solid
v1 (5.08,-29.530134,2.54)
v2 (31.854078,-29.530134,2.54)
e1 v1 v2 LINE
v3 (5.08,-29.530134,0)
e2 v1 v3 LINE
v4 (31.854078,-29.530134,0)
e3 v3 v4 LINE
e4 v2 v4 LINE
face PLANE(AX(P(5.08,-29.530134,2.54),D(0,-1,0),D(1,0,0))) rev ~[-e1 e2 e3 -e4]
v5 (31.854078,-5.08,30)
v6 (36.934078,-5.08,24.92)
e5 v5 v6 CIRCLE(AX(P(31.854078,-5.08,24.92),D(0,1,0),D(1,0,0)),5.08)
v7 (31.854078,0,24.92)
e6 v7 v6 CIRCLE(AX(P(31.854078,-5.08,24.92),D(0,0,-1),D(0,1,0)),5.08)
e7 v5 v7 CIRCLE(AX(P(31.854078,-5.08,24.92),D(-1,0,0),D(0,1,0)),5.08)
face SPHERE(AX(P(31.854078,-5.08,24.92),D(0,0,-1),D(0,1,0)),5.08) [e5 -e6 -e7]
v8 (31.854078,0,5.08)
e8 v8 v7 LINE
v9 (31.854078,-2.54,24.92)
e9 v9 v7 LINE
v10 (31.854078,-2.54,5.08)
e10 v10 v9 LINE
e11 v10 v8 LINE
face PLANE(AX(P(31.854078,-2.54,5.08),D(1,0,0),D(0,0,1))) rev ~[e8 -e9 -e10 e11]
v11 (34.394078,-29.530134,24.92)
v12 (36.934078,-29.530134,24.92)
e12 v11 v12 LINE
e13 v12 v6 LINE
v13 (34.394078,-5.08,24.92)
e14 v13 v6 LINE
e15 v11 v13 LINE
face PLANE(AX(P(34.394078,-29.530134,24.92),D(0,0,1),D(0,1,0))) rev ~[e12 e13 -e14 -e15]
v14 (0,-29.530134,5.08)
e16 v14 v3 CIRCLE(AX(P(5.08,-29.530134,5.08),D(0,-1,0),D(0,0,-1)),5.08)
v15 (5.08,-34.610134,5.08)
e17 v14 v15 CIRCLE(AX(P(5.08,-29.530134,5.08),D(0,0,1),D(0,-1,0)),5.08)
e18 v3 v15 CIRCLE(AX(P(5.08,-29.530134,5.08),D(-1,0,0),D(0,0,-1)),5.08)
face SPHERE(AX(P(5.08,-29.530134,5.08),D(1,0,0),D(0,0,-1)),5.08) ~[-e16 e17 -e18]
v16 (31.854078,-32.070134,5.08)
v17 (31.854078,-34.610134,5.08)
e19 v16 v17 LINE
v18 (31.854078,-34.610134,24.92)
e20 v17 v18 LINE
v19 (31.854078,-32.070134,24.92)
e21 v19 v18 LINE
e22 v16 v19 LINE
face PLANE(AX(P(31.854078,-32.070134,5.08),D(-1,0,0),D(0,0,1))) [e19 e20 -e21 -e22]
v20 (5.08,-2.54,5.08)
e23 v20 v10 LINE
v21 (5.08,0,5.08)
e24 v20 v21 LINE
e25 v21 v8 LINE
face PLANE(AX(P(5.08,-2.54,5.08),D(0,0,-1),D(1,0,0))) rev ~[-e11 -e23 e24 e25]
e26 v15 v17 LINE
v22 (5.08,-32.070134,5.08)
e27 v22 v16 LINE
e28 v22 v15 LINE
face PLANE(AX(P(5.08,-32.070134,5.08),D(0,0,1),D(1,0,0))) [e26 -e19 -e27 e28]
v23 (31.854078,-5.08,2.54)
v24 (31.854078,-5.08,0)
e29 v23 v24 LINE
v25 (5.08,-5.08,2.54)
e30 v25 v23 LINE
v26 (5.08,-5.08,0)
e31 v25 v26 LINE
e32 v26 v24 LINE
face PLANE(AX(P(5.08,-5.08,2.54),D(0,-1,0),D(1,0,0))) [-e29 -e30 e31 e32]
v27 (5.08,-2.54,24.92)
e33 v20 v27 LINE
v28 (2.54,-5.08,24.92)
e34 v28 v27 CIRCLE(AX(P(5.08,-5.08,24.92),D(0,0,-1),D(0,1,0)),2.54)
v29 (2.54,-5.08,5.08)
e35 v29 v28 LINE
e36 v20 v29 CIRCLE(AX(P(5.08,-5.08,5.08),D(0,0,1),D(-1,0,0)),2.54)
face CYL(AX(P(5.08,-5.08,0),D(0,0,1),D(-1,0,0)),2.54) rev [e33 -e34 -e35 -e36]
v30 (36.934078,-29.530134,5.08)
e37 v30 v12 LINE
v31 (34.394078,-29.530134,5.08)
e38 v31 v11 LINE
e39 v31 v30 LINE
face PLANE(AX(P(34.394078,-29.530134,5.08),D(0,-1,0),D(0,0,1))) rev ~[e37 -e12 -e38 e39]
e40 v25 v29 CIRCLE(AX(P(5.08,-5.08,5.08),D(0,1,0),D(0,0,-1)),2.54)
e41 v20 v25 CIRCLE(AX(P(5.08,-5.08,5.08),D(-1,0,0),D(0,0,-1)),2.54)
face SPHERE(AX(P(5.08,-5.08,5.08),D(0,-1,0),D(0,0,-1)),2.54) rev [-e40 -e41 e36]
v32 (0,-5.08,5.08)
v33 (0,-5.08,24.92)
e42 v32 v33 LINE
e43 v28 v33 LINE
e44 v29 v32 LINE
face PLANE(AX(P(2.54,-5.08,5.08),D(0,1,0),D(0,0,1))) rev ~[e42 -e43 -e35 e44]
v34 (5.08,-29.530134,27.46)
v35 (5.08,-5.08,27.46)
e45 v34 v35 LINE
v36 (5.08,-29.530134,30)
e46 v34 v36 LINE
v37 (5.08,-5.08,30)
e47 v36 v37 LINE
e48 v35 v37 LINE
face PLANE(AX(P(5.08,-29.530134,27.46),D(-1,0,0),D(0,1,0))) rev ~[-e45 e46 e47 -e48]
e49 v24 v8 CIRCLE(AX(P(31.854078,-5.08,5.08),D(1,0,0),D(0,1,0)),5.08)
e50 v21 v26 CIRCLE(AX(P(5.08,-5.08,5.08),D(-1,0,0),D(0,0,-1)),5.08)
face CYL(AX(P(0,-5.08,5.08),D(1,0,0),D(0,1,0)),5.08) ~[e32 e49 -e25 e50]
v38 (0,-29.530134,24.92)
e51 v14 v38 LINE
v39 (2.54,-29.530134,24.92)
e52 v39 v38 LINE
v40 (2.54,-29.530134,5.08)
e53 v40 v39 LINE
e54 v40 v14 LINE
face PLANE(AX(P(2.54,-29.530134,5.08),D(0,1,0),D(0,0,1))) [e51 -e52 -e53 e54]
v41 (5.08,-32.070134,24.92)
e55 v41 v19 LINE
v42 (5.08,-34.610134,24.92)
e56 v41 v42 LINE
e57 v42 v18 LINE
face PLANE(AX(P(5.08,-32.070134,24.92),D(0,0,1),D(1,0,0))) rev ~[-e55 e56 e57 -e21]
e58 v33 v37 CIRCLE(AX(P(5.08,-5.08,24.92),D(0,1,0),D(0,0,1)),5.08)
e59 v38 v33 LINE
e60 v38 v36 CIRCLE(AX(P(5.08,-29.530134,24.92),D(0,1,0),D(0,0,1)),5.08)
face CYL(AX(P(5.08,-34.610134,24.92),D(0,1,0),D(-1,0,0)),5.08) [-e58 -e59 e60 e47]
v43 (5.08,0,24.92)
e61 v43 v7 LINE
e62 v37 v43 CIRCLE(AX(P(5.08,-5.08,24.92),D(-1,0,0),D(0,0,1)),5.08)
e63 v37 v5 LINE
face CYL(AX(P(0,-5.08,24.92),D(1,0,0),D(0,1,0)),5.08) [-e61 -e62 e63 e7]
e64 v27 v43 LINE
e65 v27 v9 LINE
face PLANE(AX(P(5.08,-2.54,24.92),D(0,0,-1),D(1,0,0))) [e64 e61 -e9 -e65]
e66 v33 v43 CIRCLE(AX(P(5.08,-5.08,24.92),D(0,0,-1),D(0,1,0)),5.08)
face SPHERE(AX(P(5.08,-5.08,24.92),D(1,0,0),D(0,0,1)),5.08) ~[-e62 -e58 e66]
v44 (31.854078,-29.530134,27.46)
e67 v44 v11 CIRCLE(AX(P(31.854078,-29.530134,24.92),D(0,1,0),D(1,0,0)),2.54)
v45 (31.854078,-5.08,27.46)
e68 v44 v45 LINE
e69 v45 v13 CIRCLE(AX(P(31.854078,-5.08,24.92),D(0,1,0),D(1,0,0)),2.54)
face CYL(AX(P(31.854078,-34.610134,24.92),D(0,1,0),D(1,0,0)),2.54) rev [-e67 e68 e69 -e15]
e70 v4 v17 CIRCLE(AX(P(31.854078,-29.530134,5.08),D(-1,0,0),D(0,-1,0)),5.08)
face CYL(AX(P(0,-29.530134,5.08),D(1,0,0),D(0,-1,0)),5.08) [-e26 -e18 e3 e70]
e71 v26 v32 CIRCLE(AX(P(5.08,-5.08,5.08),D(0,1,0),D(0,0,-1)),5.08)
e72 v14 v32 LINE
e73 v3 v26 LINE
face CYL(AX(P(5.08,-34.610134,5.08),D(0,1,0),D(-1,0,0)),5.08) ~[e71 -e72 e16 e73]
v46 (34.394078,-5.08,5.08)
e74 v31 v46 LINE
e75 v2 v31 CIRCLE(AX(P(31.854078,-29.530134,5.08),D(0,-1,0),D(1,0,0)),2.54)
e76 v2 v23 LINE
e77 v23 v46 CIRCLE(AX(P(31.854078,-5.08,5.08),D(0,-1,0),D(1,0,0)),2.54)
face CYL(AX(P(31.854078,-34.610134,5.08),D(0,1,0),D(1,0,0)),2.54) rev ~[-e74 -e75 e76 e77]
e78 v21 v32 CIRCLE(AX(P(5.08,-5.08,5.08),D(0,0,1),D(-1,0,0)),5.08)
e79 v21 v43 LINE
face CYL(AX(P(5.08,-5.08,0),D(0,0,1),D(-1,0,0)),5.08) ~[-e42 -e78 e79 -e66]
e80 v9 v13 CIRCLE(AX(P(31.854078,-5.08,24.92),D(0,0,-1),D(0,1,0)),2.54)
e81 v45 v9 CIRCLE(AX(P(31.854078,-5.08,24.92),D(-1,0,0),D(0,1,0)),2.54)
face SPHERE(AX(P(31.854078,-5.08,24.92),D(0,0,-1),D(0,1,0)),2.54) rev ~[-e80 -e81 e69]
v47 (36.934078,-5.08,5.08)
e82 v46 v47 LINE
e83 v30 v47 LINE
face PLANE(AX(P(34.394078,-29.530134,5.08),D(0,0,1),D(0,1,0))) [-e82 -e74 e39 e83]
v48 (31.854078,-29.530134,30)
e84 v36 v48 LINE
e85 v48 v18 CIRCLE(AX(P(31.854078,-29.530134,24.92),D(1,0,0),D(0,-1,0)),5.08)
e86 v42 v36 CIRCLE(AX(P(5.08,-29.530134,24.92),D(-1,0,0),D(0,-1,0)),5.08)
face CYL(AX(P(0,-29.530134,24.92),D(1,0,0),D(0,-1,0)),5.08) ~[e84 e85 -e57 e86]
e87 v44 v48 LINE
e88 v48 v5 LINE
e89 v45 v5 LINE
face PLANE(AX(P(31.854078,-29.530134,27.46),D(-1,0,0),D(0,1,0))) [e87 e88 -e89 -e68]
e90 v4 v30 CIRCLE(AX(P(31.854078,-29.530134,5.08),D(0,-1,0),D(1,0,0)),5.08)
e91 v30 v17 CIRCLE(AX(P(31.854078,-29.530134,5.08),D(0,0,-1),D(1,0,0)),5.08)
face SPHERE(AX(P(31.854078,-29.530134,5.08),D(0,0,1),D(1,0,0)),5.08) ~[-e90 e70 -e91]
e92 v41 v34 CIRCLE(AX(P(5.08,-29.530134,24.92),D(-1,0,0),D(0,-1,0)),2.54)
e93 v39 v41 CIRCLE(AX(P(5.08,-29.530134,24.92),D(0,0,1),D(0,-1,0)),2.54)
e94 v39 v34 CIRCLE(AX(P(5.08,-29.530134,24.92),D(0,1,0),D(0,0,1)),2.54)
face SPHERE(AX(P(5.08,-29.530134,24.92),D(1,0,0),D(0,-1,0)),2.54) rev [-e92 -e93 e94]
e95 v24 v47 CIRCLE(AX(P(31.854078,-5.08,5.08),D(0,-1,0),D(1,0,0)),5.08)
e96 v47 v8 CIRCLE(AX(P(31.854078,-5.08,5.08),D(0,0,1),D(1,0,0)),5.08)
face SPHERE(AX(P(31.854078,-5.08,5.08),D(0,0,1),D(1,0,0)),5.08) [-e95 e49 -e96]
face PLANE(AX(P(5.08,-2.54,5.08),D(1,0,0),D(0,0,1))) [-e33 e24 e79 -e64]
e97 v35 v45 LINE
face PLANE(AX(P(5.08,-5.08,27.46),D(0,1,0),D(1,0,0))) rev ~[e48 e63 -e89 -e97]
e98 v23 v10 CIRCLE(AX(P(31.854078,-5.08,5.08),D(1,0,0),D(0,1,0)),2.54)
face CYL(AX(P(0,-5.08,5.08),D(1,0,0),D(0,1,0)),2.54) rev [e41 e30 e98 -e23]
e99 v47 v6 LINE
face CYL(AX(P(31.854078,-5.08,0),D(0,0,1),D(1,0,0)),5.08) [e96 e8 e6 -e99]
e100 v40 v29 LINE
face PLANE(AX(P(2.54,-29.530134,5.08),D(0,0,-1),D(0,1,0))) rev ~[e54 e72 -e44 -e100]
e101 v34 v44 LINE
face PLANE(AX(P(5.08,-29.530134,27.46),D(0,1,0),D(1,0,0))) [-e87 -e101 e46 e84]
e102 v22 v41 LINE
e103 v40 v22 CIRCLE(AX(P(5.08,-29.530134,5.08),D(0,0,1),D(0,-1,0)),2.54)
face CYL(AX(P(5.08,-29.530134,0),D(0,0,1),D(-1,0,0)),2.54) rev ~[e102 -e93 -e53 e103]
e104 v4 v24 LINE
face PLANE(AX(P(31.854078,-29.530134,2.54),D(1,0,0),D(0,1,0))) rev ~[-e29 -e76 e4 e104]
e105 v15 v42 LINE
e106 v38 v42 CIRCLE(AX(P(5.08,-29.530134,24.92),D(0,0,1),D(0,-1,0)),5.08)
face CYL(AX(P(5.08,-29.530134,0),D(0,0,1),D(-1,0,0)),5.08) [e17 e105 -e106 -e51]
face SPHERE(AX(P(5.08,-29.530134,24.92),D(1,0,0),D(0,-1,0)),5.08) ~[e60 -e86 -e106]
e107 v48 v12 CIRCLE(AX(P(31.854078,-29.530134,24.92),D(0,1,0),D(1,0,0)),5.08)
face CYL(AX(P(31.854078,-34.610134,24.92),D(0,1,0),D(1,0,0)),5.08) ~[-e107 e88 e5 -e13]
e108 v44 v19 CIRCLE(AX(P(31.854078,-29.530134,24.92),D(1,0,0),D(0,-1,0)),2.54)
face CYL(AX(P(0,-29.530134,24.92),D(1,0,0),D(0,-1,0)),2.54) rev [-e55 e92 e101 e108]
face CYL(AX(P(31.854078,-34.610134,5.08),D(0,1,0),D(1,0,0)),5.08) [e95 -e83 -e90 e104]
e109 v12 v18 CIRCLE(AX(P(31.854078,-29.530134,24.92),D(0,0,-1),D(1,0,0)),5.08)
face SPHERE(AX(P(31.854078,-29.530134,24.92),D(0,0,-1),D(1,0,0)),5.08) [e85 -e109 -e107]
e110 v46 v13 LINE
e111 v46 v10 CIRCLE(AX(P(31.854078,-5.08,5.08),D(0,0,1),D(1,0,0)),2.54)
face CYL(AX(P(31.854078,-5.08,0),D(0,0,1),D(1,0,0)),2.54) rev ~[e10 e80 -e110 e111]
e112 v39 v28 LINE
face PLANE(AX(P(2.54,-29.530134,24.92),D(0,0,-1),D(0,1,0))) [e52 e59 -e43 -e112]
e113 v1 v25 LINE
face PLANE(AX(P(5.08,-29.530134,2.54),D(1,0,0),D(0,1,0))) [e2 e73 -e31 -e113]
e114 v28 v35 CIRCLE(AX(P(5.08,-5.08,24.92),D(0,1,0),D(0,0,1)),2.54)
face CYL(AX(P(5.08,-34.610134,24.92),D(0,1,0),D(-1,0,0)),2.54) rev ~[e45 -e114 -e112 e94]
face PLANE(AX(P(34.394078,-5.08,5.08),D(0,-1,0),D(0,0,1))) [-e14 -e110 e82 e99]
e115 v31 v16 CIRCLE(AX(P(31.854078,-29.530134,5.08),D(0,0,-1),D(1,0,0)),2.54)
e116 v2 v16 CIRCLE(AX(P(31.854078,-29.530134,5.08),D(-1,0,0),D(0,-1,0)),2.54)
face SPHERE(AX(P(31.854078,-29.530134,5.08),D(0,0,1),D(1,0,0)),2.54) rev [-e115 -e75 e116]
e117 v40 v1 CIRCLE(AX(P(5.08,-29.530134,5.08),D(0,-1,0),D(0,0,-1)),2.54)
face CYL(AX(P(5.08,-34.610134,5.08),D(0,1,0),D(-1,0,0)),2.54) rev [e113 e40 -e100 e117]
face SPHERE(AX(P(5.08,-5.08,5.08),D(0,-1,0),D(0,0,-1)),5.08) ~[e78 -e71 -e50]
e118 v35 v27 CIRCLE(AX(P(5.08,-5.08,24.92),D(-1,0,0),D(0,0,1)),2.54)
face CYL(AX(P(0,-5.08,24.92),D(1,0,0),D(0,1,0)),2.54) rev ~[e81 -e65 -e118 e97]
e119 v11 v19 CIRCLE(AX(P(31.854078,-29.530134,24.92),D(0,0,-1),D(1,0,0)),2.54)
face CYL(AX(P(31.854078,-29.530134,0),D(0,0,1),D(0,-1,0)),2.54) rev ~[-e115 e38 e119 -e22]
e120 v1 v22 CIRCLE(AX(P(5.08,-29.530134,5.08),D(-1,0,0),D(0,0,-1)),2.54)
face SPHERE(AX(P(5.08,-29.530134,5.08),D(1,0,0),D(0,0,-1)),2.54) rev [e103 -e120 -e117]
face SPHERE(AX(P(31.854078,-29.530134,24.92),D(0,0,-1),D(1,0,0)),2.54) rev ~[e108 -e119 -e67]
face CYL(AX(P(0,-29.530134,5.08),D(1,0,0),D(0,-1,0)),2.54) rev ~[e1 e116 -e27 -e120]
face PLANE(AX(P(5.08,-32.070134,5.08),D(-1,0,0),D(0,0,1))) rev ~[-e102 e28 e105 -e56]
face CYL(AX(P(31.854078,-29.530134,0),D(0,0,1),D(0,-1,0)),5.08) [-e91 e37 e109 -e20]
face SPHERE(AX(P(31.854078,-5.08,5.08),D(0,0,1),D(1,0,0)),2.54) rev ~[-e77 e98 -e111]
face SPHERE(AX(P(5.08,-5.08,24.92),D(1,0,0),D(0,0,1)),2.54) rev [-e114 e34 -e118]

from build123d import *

# Parameters (mm, degrees)
F0_W     = 36.9340777397
F0_H     = 34.6101336181
F1_DEPTH = 30
F2_R     = 5.08
F3_T     = -2.54


# Not quite as in the source:
# - a shell that OpenCascade refuses in one call is made with other operations: the cavity is built on its own and cut out


with BuildPart() as f1:
    # F0 (on Top) → F1 (new body)
    with BuildSketch(Plane.XY):
        with Locations((18.4670388699, -17.3050668091)):
            Rectangle(F0_W, F0_H)
    extrude(amount=F1_DEPTH)

    # F2
    f2_edges = [f1.edges().sort_by_distance(p)[0] for p in [
        (36.934078, -34.610134, 15),
        (36.934078, 0, 15),
        (36.934078, -17.305067, 0),
        (18.467039, -34.610134, 0),
        (0, -17.305067, 0),
        (18.467039, 0, 0),
        (18.467039, 0, 30),
        (36.934078, -17.305067, 30),
        (18.467039, -34.610134, 30),
        (0, -34.610134, 15),
        (0, -17.305067, 30),
        (0, 0, 15),
    ]]
    fillet(f2_edges, radius=F2_R)

    # F3: a shell. OpenCascade refuses it in one call, so the cavity is built on its own and cut out:
    # the body offset inwards by the wall thickness, plus a prism from it out through each open face.
    f3_core = offset(f1.part, amount=F3_T, mode=Mode.PRIVATE)
    f3_exits = [f3_core.faces().sort_by_distance(p)[0] for p in [
        (18.467039, -17.305067, 27.46),
        (18.467039, -32.070134, 15),
        (18.467039, -2.54, 15),
        (2.54, -17.305067, 15),
        (18.467039, -17.305067, 2.54),
        (34.394078, -17.305067, 15),
    ]]
    add(f3_core, mode=Mode.SUBTRACT)
    extrude(f3_exits, amount=-F3_T, mode=Mode.SUBTRACT)


solid = f1.part
